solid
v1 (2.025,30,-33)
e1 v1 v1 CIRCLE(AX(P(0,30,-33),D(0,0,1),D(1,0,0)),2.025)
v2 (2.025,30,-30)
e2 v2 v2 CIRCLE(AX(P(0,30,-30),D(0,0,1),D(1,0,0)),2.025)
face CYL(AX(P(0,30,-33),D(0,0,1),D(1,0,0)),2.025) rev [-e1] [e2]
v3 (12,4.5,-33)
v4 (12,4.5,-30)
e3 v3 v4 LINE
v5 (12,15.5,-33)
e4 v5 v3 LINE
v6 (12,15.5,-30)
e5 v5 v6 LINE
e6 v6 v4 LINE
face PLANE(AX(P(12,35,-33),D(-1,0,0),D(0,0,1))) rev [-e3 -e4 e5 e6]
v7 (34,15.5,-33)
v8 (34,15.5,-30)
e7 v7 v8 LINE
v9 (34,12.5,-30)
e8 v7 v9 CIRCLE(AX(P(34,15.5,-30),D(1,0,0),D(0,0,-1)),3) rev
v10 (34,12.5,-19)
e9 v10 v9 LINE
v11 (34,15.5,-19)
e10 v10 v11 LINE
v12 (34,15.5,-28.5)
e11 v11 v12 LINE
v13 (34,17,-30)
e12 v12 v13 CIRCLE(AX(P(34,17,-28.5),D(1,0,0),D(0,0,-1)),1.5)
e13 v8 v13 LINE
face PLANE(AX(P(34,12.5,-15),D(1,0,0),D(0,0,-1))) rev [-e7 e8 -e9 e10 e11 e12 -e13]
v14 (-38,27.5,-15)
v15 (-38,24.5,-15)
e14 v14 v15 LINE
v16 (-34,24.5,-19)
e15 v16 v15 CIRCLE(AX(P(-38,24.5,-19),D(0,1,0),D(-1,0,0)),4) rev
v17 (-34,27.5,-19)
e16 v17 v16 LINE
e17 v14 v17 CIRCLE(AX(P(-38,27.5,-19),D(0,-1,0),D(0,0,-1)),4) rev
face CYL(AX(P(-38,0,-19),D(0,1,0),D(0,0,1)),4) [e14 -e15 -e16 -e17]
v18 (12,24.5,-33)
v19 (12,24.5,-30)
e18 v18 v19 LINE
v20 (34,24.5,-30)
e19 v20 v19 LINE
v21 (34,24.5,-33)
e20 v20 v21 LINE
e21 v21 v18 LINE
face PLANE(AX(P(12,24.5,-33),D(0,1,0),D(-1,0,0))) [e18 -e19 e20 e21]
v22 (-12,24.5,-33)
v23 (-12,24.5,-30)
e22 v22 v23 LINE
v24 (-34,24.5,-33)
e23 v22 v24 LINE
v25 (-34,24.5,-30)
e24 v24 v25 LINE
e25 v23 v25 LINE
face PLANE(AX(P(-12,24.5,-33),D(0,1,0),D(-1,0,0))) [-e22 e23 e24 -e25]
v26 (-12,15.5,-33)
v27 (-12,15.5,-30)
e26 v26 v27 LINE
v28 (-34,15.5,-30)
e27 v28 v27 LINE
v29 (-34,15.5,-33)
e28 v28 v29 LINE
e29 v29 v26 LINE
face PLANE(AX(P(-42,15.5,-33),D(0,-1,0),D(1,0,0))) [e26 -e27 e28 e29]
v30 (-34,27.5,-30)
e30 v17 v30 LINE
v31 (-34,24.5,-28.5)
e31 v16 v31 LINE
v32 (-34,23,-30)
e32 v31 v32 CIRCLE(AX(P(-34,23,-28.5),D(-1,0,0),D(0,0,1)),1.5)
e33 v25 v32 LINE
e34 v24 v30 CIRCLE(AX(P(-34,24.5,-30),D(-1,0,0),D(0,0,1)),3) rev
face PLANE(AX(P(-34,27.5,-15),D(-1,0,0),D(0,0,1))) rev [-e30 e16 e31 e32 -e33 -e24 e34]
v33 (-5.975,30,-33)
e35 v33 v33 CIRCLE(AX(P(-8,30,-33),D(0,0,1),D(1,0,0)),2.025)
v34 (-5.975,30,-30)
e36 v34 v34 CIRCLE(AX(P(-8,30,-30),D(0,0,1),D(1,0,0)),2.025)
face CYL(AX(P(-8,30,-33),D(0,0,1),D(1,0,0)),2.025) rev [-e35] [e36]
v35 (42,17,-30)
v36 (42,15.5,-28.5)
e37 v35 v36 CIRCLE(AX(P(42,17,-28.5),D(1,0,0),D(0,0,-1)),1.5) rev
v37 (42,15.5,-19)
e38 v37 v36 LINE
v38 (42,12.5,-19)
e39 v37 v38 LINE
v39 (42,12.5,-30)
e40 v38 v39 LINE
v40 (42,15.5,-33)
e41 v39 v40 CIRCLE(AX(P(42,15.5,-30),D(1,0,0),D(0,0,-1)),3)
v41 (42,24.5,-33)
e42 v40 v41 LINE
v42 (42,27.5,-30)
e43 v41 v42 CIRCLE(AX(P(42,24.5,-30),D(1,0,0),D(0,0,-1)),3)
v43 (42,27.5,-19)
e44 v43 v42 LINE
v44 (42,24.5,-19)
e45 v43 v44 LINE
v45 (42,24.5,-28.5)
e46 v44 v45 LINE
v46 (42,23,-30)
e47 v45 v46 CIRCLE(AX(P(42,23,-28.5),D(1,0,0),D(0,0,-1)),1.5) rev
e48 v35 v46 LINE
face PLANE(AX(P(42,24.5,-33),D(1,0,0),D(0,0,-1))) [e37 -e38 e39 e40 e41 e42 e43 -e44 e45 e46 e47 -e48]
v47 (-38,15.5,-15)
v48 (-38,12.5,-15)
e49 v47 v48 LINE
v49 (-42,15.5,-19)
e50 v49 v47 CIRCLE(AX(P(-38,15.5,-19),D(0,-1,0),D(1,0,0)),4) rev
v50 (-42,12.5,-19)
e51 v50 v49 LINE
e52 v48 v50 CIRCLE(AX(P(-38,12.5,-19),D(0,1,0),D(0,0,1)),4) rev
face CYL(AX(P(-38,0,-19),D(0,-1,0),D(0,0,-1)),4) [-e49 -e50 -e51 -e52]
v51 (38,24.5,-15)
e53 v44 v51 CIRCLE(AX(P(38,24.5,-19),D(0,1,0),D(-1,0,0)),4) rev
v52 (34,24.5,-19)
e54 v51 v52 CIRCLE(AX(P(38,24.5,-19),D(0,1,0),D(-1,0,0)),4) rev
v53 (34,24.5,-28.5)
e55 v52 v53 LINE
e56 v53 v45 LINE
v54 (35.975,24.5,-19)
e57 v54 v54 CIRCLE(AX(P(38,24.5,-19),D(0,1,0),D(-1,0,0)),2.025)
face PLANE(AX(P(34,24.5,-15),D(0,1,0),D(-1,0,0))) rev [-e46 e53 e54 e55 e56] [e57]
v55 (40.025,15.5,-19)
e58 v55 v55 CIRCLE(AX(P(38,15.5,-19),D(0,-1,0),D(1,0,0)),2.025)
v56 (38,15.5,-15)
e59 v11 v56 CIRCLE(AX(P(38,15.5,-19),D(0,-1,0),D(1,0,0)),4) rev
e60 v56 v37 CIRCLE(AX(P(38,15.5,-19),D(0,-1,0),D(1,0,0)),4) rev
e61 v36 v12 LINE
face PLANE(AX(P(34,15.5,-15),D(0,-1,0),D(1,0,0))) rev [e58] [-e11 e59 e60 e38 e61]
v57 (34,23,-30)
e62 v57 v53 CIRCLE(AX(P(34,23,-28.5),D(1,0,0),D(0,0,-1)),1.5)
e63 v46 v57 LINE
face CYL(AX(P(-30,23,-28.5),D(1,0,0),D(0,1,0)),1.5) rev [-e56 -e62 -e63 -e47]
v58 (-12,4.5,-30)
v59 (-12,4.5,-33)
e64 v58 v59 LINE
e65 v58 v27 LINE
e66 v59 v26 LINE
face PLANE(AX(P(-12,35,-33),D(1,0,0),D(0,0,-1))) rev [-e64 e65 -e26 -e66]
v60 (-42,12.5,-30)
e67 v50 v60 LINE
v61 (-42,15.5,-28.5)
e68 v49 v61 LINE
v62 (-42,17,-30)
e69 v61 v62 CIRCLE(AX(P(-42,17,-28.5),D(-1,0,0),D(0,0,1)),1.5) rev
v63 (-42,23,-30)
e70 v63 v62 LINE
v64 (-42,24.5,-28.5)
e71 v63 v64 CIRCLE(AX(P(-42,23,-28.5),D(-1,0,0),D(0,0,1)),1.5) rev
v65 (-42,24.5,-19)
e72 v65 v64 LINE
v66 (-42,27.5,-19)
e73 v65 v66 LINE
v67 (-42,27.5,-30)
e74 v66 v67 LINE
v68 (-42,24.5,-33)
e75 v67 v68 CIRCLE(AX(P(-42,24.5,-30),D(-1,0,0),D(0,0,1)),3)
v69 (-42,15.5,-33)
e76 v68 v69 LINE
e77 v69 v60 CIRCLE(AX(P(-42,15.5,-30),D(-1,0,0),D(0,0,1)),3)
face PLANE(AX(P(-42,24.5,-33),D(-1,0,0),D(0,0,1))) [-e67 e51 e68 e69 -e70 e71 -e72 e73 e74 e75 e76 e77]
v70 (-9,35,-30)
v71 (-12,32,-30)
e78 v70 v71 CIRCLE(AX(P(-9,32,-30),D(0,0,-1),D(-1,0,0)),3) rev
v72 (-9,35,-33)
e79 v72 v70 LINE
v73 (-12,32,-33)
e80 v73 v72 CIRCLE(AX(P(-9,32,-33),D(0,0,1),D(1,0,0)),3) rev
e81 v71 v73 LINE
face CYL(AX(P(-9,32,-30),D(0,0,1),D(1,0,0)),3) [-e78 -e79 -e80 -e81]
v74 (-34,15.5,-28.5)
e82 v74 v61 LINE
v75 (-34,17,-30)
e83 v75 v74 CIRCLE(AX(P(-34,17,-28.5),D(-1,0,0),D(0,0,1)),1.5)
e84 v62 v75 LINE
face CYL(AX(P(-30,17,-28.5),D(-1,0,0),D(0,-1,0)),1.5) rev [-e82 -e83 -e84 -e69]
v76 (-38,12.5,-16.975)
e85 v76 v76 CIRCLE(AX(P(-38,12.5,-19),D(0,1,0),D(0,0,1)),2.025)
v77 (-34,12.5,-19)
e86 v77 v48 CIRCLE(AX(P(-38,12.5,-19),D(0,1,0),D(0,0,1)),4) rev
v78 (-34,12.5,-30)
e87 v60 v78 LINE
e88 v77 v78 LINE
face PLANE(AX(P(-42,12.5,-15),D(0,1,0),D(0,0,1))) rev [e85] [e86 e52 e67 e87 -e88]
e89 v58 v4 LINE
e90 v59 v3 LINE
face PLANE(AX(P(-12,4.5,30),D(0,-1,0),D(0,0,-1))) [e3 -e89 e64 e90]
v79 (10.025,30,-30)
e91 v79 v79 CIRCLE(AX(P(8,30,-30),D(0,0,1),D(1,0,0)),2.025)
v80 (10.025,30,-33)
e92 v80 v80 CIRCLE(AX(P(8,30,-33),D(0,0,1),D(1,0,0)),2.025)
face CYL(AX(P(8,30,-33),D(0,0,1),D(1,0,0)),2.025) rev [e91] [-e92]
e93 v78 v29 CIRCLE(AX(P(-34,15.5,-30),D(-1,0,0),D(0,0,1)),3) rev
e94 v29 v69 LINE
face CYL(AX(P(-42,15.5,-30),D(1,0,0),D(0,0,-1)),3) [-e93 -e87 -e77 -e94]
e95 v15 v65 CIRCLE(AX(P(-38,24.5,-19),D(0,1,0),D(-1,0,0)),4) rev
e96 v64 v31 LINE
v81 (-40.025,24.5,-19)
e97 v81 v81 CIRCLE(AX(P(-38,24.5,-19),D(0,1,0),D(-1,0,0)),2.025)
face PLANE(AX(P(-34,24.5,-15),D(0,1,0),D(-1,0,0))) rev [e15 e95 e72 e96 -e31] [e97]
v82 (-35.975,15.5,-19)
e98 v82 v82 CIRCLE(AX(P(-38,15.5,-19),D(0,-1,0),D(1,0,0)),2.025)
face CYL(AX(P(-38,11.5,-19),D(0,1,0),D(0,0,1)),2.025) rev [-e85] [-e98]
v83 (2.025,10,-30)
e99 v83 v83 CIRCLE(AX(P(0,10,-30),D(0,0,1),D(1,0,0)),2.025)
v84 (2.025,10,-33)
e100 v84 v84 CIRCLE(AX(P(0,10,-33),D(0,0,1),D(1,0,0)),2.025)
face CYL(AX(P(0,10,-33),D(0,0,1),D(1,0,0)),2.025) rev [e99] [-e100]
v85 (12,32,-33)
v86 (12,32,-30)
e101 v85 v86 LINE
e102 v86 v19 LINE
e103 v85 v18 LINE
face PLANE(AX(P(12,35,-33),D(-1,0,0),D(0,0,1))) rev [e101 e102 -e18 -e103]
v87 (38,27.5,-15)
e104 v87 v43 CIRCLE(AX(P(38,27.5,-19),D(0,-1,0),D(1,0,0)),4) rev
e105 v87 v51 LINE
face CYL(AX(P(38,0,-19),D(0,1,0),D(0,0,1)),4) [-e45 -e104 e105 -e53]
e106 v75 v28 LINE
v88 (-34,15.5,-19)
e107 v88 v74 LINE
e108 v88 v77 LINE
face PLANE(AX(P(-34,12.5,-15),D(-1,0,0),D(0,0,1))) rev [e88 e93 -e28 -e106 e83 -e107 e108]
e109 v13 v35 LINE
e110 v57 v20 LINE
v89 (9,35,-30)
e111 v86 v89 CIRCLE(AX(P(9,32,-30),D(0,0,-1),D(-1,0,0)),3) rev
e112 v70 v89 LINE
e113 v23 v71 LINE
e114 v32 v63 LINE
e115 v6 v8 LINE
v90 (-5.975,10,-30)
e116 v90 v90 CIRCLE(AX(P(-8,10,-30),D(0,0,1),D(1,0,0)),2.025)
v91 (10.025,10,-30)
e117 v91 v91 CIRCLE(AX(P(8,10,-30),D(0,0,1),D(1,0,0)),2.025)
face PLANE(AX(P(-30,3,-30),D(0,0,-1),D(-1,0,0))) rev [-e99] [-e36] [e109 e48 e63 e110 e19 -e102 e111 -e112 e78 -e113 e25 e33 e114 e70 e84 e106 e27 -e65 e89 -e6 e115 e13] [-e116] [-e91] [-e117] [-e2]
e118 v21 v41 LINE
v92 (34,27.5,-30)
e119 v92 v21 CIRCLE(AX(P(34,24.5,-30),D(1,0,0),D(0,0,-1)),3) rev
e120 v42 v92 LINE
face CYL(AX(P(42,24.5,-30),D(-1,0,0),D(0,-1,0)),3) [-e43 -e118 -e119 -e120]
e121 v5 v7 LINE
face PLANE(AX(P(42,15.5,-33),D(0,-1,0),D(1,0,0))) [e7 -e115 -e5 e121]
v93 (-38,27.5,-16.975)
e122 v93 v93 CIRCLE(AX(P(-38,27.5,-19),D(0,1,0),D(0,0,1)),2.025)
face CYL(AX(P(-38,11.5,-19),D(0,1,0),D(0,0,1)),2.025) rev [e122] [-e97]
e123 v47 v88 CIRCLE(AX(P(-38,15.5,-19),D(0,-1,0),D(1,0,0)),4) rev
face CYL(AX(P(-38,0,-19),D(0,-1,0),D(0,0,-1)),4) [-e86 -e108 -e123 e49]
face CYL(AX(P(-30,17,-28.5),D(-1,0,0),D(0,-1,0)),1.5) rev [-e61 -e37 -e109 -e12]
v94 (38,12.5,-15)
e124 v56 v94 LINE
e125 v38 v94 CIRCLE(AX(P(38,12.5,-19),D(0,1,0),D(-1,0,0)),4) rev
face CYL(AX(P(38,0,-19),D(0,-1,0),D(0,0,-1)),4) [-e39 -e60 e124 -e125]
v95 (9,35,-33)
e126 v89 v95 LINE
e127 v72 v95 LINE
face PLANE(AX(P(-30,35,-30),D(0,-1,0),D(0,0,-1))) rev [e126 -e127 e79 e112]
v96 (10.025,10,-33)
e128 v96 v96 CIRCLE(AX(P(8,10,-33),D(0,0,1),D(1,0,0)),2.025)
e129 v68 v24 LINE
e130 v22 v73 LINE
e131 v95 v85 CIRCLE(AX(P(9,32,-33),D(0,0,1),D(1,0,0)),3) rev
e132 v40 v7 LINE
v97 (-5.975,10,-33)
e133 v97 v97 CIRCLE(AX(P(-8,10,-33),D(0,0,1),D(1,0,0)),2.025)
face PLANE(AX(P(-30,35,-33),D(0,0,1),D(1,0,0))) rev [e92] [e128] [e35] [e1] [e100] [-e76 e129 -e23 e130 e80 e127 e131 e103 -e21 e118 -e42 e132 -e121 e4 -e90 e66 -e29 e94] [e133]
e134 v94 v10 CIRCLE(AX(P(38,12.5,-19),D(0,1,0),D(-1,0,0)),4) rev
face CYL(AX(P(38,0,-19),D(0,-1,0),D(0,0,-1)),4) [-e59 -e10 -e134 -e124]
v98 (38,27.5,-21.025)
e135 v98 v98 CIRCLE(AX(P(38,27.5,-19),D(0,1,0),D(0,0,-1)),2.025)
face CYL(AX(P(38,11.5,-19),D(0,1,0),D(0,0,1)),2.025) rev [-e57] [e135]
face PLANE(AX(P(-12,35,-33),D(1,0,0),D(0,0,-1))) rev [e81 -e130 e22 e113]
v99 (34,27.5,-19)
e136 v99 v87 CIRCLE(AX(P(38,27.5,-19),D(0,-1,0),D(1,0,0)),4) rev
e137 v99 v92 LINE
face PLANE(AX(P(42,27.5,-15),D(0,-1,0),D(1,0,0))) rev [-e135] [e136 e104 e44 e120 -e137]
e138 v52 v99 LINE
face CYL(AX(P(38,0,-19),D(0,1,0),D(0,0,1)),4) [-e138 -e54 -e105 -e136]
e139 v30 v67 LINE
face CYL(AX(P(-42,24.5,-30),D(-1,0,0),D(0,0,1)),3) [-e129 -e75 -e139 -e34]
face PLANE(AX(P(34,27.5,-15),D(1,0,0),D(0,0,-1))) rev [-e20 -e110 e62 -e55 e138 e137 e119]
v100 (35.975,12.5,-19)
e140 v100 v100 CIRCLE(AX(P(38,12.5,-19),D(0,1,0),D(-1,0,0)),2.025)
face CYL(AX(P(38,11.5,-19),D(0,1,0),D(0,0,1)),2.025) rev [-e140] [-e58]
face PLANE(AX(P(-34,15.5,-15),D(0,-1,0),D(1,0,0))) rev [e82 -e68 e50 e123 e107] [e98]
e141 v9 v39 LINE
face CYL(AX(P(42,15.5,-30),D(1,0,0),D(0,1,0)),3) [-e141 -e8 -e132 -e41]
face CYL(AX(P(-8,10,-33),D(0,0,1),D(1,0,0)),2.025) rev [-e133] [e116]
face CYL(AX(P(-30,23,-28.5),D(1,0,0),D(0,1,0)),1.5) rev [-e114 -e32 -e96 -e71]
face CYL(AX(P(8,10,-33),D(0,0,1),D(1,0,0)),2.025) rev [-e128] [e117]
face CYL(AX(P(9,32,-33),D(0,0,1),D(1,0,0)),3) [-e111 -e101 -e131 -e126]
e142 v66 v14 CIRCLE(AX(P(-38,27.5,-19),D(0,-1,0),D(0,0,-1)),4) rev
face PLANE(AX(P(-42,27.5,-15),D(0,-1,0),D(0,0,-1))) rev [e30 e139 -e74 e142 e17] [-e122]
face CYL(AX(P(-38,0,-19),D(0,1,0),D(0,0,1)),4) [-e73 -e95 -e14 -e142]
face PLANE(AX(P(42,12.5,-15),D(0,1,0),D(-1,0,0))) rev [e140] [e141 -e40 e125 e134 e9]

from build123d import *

# Parameters (mm, degrees)
SKETCH1_W                = 40
SKETCH1_H                = 60
BOSS_EXTRUDE1_DEPTH      = 3
BOSS_EXTRUDE3_DEPTH      = 10
BOSS_EXTRUDE3_DEPTH_BACK = 50
SKETCH4_R                = 2.025
CUT_EXTRUDE1_DEPTH       = 76.663729752
SKETCH5_W                = 10
SKETCH5_H                = 3
CUT_EXTRUDE3_DEPTH       = 5
FILLET5_R                = 3
FILLET6_R                = 1.5
SKETCH6_W                = 18
SKETCH6_H                = 30
CUT_EXTRUDE4_DEPTH       = 76.663729752
SKETCH7_W                = 30
SKETCH7_H                = 9
BOSS_EXTRUDE4_DEPTH      = 3
SKETCH8_W                = 8
SKETCH8_H                = 4.5
CUT_EXTRUDE5_DEPTH       = 62.26173357
BOSS_EXTRUDE5_DEPTH      = 15
BOSS_EXTRUDE5_DEPTH_BACK = 3
SKETCH9_W                = 8
SKETCH9_H                = 3
FILLET7_R                = 3
FILLET8_R                = 1.5
SKETCH10_R               = 2.025
CUT_EXTRUDE6_DEPTH       = 16
FILLET9_R                = 4
FILLET10_R               = 3
CUT_EXTRUDE7_DEPTH       = 82.172655494
CUT_EXTRUDE7_DEPTH_BACK  = 10


with BuildPart() as part:
    # Sketch1 → Boss-Extrude1 (new body)
    with BuildSketch(Plane(origin=(0, 0, 0), x_dir=(1, 0, 0), z_dir=(0, 1, 0))):
        Rectangle(SKETCH1_W, SKETCH1_H)
    extrude(amount=BOSS_EXTRUDE1_DEPTH)

    # Sketch3 → Boss-Extrude3 (add, two sides: drawn at the far end of the back side and taken through both)
    with BuildSketch(Plane.ZY.offset(20).offset(-BOSS_EXTRUDE3_DEPTH_BACK)):
        Polygon((-30, 3), (-30, 35), (-33, 35), (-33, 0), (-30, 0), align=None)
    extrude(amount=BOSS_EXTRUDE3_DEPTH + BOSS_EXTRUDE3_DEPTH_BACK)

    # Sketch4 → Cut-Extrude1 (cut, through all)
    with BuildSketch(Plane.XY.offset(-30)):
        with Locations((0, 30)):
            Circle(SKETCH4_R)
        with Locations((8, 30)):
            Circle(SKETCH4_R)
        with Locations((16, 30)):
            Circle(SKETCH4_R)
        with Locations((-8, 30)):
            Circle(SKETCH4_R)
        with Locations((-16, 30)):
            Circle(SKETCH4_R)
        with Locations((-16, 10)):
            Circle(SKETCH4_R)
        with Locations((-8, 10)):
            Circle(SKETCH4_R)
        with Locations((0, 10)):
            Circle(SKETCH4_R)
        with Locations((8, 10)):
            Circle(SKETCH4_R)
        with Locations((16, 10)):
            Circle(SKETCH4_R)
    extrude(amount=-CUT_EXTRUDE1_DEPTH, mode=Mode.SUBTRACT)

    # Sketch5 → Cut-Extrude3 (cut)
    with BuildSketch(Plane.XZ):
        with Locations((-25, -31.5)):
            Rectangle(SKETCH5_W, SKETCH5_H)
        with Locations((25, -31.5)):
            Rectangle(SKETCH5_W, SKETCH5_H)
    extrude(amount=-CUT_EXTRUDE3_DEPTH, mode=Mode.SUBTRACT)

    # Fillet5
    fillet5_edges = [part.edges().sort_by_distance(p)[0] for p in [
        (0, 0, -33),
    ]]
    fillet(fillet5_edges, radius=FILLET5_R)

    # Fillet6
    fillet6_edges = [part.edges().sort_by_distance(p)[0] for p in [
        (0, 3, -30),
    ]]
    fillet(fillet6_edges, radius=FILLET6_R)

    # Sketch6 → Cut-Extrude4 (cut, through all)
    with BuildSketch(Plane.XY.offset(-30)):
        with Locations((-21, 20)):
            Rectangle(SKETCH6_W, SKETCH6_H)
        with Locations((21, 20)):
            Rectangle(SKETCH6_W, SKETCH6_H)
    extrude(amount=-CUT_EXTRUDE4_DEPTH, mode=Mode.SUBTRACT)

    # Sketch7 → Boss-Extrude4 (add)
    with BuildSketch(Plane.XY.offset(-30)):
        with Locations((-27, 20)):
            Rectangle(SKETCH7_W, SKETCH7_H)
        with Locations((27, 20)):
            Rectangle(SKETCH7_W, SKETCH7_H)
    extrude(amount=-BOSS_EXTRUDE4_DEPTH)

    # Sketch8 → Cut-Extrude5 (cut, through all)
    with BuildSketch(Plane(origin=(0, 5, 0), x_dir=(1, 0, 0), z_dir=(0, 1, 0))):
        with Locations((-16, 30.75)):
            Rectangle(SKETCH8_W, SKETCH8_H)
        with Locations((16, 30.75)):
            Rectangle(SKETCH8_W, SKETCH8_H)
    extrude(amount=-CUT_EXTRUDE5_DEPTH, mode=Mode.SUBTRACT)

    # Sketch9 → Boss-Extrude5 (add, two sides: drawn at the far end of the back side and taken through both)
    with BuildSketch(Plane.XY.offset(-30).offset(-BOSS_EXTRUDE5_DEPTH_BACK)):
        with Locations((-38, 26)):
            Rectangle(SKETCH9_W, SKETCH9_H)
        with Locations((-38, 14)):
            Rectangle(SKETCH9_W, SKETCH9_H)
        with Locations((38, 14)):
            Rectangle(SKETCH9_W, SKETCH9_H)
        with Locations((38, 26)):
            Rectangle(SKETCH9_W, SKETCH9_H)
    extrude(amount=BOSS_EXTRUDE5_DEPTH + BOSS_EXTRUDE5_DEPTH_BACK)

    # Fillet7
    fillet7_edges = [part.edges().sort_by_distance(p)[0] for p in [
        (38, 12.5, -33),
        (-38, 12.5, -33),
        (38, 27.5, -33),
        (-38, 27.5, -33),
    ]]
    fillet(fillet7_edges, radius=FILLET7_R)

    # Fillet8
    fillet8_edges = [part.edges().sort_by_distance(p)[0] for p in [
        (-38, 15.5, -30),
        (38, 24.5, -30),
        (-38, 24.5, -30),
        (38, 15.5, -30),
    ]]
    fillet(fillet8_edges, radius=FILLET8_R)

    # Sketch10 → Cut-Extrude6 (cut)
    with BuildSketch(Plane(origin=(0, 27.5, 0), x_dir=(1, 0, 0), z_dir=(0, 1, 0))):
        with Locations(Location((-38, 19, 0), (0, 0, 270))):
            Circle(SKETCH10_R)
        with Locations(Location((38, 19, 0), (0, 0, 180))):
            Circle(SKETCH10_R)
    extrude(amount=-CUT_EXTRUDE6_DEPTH, mode=Mode.SUBTRACT)

    # Fillet9
    fillet9_edges = [part.edges().sort_by_distance(p)[0] for p in [
        (42, 14, -15),
        (42, 26, -15),
        (-34, 14, -15),
        (-34, 26, -15),
        (34, 14, -15),
        (34, 26, -15),
        (-42, 14, -15),
        (-42, 26, -15),
    ]]
    fillet(fillet9_edges, radius=FILLET9_R - 0.0001)  # a hair under: the kernel refuses the full size

    # Fillet10
    fillet10_edges = [part.edges().sort_by_distance(p)[0] for p in [
        (-12, 35, -31.5),
        (12, 35, -31.5),
        (-20, 1.5, -28.5),
        (20, 1.5, -28.5),
        (20, 1.5, 30),
        (-20, 1.5, 30),
    ]]
    fillet(fillet10_edges, radius=FILLET10_R)

    # Sketch11 → Cut-Extrude7 (cut, two sides: drawn at the far end of the back side and taken through both)
    with BuildSketch(Plane.XY.offset(-30).offset(-CUT_EXTRUDE7_DEPTH_BACK)):
        Polygon((-12, 4.5), (-24.843413812, 4.5), (-24.843413812, -2.532189306), (23.385466992, -2.532189306), (23.385466992, 4.5), align=None)
    extrude(amount=CUT_EXTRUDE7_DEPTH + CUT_EXTRUDE7_DEPTH_BACK, mode=Mode.SUBTRACT)


solid = part.part
